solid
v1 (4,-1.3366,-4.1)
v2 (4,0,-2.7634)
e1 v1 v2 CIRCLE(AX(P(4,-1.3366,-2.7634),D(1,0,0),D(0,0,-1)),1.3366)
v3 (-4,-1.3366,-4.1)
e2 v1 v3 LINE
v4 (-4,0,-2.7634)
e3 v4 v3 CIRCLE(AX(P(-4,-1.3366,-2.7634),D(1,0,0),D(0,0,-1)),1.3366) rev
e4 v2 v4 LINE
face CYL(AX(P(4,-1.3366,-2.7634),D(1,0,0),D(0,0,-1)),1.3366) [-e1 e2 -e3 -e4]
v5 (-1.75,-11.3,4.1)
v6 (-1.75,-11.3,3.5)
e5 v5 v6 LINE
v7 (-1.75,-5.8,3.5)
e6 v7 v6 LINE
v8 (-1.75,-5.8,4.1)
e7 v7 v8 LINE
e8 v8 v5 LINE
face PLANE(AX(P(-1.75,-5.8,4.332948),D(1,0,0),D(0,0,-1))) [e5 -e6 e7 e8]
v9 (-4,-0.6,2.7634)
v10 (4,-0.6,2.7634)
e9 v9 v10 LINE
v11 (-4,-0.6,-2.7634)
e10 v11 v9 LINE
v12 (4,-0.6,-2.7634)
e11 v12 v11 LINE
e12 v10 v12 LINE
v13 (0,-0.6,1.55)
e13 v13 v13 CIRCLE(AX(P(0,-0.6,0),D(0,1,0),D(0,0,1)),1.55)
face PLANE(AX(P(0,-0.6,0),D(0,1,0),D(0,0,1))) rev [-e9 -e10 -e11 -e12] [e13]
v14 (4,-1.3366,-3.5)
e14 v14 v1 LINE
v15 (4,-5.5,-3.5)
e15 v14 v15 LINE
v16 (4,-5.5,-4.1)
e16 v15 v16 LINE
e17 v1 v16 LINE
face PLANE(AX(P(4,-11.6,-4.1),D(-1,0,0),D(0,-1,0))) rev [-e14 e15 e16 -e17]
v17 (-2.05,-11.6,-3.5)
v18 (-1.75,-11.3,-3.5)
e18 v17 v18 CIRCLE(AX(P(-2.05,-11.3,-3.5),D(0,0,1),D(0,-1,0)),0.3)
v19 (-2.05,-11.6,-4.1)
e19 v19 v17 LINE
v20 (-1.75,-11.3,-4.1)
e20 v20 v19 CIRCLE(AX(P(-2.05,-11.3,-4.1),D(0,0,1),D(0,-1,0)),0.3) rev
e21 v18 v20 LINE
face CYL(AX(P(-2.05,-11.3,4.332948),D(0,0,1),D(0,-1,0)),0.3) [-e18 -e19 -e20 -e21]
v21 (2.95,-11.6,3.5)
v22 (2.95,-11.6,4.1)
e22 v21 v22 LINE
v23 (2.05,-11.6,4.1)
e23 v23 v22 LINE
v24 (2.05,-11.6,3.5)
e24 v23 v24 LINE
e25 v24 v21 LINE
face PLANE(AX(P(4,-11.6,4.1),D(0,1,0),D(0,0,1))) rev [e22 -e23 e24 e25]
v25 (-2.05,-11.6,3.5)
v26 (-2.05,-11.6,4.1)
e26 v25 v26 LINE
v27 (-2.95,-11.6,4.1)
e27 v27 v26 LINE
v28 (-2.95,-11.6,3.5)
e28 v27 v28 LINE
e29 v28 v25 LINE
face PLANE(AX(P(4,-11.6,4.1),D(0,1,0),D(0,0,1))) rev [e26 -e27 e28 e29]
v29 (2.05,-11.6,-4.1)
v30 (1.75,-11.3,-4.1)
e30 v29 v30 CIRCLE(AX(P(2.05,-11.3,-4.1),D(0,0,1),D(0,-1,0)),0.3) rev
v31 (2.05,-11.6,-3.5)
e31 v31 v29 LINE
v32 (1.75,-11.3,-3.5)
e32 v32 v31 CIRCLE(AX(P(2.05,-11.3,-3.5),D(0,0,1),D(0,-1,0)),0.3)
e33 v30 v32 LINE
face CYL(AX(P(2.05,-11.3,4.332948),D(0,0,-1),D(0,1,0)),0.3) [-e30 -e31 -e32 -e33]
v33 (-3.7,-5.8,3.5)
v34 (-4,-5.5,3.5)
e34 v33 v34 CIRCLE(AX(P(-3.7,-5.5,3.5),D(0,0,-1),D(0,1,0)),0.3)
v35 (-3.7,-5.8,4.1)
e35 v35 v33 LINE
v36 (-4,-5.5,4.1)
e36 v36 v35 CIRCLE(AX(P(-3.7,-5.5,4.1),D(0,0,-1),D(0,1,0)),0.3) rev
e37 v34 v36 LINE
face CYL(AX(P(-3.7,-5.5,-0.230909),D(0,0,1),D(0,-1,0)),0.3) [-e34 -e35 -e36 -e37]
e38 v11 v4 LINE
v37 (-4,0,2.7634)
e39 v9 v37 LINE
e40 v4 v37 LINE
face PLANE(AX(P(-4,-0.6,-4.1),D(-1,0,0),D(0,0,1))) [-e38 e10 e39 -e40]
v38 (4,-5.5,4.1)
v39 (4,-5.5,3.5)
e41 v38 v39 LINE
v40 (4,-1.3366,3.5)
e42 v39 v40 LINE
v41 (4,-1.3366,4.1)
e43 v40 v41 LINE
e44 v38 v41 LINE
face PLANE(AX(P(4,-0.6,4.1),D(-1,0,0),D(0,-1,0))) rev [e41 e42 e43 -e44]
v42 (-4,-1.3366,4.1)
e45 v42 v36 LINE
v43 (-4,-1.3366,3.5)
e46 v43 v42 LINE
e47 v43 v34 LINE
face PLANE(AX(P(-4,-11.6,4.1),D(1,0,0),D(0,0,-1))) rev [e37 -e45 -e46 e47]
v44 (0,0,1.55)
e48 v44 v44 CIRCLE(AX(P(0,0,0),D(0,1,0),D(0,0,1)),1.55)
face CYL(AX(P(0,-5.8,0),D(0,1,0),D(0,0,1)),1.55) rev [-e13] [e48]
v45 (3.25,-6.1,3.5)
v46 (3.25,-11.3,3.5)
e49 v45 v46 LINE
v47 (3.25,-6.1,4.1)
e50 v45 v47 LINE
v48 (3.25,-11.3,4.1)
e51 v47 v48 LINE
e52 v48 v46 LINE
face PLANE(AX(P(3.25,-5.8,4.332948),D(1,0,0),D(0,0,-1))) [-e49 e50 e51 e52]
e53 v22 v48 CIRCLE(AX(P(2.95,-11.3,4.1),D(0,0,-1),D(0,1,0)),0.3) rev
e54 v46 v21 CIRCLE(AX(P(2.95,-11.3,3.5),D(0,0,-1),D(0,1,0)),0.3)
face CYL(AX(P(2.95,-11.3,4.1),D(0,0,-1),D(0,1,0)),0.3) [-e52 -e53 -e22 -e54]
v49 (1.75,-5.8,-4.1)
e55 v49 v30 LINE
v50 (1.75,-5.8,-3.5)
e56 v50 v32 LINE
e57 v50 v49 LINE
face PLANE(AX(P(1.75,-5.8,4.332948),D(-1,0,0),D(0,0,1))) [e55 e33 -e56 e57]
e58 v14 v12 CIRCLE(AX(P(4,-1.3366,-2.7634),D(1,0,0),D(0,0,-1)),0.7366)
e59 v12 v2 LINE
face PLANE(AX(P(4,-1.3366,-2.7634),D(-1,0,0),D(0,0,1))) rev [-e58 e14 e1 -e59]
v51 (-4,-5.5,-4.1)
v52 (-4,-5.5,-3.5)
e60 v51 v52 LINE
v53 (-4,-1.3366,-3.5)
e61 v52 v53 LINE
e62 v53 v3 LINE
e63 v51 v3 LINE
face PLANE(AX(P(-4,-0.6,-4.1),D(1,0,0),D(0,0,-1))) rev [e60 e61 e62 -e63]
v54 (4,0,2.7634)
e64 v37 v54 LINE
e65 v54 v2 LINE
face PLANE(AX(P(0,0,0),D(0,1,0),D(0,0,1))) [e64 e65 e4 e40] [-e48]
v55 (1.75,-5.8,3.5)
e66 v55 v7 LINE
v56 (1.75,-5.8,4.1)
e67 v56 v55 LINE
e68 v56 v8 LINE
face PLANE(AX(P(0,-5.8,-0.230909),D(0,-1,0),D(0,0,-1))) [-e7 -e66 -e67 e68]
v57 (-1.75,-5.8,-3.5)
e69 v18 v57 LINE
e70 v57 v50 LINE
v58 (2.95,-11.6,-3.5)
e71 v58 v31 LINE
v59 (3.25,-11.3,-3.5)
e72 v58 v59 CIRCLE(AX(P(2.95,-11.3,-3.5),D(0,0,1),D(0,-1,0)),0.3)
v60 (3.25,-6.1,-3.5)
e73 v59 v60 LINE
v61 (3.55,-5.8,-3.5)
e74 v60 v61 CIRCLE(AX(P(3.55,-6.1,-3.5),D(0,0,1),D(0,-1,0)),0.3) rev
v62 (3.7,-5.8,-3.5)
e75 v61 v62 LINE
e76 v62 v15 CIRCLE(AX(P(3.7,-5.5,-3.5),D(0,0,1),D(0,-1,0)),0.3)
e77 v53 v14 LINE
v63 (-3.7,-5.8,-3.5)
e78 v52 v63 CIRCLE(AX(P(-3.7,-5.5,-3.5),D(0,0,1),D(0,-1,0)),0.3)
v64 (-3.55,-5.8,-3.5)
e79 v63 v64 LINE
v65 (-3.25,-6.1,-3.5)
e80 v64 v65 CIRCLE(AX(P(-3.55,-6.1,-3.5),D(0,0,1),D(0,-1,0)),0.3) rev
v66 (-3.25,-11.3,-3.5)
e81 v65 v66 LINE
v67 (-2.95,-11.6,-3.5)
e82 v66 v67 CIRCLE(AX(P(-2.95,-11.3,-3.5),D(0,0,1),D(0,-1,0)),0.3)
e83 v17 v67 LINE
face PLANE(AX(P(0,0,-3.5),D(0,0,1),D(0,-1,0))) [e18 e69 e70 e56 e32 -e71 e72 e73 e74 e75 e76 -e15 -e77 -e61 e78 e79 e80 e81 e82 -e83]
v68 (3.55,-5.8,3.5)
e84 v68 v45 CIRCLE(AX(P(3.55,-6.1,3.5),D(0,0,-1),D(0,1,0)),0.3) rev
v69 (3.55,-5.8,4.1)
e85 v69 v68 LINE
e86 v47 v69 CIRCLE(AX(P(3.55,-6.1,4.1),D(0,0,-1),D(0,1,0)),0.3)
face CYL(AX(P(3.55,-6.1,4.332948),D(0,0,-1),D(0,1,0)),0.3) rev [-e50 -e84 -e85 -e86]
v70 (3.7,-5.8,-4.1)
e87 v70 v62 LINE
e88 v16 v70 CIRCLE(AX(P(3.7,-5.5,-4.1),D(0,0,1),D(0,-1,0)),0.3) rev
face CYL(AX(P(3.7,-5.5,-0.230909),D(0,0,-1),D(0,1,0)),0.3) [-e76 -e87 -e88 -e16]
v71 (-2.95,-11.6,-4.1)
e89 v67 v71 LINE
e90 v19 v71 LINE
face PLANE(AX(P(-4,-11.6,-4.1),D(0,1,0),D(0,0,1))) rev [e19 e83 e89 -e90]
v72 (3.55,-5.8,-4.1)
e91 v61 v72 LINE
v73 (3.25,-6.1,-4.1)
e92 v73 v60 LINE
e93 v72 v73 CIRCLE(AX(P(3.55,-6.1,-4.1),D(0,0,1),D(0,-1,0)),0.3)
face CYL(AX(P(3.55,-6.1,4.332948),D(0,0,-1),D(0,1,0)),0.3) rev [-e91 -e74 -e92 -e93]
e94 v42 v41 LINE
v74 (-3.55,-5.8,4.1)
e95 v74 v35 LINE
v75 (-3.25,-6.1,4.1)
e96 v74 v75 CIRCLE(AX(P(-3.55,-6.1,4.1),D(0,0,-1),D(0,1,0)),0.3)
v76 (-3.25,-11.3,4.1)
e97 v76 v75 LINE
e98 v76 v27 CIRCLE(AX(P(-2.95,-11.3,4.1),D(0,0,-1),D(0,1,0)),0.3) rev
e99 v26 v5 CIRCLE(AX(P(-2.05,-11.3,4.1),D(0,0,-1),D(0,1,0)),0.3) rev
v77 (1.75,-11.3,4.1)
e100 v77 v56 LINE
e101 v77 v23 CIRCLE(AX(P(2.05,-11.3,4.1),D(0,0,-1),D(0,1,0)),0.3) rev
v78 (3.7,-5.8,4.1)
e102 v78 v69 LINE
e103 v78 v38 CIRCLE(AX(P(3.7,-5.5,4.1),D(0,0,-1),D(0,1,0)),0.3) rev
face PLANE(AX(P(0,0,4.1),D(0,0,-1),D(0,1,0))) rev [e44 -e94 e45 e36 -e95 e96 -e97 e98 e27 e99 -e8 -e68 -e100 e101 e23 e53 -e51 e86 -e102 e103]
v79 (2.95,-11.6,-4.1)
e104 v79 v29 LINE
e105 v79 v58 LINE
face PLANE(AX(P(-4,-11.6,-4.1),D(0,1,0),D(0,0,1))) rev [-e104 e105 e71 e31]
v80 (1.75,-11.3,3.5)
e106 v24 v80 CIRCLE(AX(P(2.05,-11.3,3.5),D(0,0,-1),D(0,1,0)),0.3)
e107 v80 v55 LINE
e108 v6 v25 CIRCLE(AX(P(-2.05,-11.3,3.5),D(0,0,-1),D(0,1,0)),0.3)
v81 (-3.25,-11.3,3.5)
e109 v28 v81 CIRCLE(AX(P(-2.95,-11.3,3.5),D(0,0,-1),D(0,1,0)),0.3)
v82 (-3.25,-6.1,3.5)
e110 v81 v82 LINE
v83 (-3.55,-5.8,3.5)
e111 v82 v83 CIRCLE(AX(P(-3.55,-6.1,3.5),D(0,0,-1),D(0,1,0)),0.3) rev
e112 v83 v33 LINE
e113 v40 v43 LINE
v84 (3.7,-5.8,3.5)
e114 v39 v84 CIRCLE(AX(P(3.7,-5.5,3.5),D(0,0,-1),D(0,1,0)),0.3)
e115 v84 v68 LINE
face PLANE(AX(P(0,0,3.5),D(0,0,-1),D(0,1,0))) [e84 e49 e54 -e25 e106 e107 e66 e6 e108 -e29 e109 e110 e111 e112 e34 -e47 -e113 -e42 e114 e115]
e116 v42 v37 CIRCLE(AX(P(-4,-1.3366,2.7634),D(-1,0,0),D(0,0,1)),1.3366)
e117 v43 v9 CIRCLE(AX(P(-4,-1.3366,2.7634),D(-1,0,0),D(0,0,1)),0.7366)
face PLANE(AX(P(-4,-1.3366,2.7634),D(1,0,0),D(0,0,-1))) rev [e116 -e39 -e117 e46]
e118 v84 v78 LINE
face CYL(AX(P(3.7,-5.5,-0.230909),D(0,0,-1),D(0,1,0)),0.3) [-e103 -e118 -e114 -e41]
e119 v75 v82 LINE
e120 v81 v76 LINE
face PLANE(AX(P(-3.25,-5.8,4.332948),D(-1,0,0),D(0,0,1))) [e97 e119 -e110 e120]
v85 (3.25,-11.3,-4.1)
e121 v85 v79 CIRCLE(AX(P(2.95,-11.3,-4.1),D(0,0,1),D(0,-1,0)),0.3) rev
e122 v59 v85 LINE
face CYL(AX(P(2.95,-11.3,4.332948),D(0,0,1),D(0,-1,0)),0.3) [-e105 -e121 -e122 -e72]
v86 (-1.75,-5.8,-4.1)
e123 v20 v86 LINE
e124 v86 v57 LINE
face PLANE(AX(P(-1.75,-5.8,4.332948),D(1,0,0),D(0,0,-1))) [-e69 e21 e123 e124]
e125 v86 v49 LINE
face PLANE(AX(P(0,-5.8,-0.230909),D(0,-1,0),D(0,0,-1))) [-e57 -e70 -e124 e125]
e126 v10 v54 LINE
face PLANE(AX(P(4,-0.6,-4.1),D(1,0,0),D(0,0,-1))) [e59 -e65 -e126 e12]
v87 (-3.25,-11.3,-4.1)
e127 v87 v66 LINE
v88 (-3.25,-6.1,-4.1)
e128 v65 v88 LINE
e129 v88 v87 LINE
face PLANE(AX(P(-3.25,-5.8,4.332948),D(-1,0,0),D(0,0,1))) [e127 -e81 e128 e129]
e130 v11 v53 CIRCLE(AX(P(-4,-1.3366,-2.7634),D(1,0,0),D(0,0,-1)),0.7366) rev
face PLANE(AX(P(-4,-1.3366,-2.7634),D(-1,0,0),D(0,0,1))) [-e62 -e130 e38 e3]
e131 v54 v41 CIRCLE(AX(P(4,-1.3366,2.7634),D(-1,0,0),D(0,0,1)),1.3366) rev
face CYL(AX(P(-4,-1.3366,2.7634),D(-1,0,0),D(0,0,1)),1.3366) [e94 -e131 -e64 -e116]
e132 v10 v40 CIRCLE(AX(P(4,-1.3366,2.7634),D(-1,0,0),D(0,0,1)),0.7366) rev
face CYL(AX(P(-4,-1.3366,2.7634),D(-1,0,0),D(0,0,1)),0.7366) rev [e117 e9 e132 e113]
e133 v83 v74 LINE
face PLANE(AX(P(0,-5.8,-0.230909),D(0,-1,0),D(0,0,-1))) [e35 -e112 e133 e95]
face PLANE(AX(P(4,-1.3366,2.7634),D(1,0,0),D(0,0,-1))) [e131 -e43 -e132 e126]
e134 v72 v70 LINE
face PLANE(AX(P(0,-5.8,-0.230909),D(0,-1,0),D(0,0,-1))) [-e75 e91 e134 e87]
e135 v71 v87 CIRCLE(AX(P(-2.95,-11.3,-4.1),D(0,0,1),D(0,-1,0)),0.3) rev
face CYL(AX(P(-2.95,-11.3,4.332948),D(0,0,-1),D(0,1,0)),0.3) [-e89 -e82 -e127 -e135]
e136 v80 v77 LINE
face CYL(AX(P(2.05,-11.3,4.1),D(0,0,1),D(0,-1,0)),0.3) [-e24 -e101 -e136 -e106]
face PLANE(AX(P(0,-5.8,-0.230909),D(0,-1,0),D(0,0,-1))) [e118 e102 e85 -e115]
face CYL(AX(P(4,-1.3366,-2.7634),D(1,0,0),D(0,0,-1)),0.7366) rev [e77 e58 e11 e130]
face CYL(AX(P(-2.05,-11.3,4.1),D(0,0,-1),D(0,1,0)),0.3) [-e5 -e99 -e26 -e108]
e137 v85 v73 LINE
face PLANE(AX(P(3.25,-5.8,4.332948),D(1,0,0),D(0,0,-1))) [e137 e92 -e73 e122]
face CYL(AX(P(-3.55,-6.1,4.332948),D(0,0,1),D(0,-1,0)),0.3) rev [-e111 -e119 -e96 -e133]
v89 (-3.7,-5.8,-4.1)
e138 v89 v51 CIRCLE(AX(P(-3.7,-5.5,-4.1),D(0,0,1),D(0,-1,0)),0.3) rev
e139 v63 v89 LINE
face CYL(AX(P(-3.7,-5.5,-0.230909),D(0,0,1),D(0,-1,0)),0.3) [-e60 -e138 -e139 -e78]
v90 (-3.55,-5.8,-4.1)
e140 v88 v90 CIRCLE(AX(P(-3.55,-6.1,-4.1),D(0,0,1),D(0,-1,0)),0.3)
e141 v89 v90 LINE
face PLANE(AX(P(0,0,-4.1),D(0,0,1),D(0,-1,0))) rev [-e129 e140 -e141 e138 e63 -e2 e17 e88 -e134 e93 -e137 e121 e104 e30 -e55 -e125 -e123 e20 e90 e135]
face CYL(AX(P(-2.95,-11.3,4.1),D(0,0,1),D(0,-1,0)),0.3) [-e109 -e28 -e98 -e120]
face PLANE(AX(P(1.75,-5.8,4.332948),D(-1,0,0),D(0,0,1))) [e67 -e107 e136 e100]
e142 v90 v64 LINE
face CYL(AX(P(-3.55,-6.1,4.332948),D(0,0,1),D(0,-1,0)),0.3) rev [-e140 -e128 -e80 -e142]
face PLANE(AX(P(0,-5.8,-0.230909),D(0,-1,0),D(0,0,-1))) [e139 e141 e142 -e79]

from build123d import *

# Parameters (mm, degrees)
SKETCH_1_W                         = 8
SKETCH_1_H                         = 8.2
SM_BASE_FLANGE_1_DEPTH             = 0.6
SM_EDGE_FLANGE_1_STRIP_W           = 3.8732
SM_EDGE_FLANGE_1_STRIP_H           = 0.6
SM_EDGE_FLANGE_1_STRIP_CUT_DEPTH   = 8
SM_EDGE_FLANGE_1_STRIP_2_W         = 3.8732
SM_EDGE_FLANGE_1_STRIP_2_H         = 0.6
SM_EDGE_FLANGE_1_STRIP_CUT_2_DEPTH = 8
SM_EDGE_FLANGE_1_DEPTH             = 8
SM_EDGE_FLANGE_1_BEND_DEPTH        = 8
SKETCH_10_OUTSIDE_W                = 13.26
SKETCH_10_OUTSIDE_H                = 13.46
SKETCH_10_OUTSIDE_W_2              = 1.5
SKETCH_10_OUTSIDE_H_2              = 9.508037294
CUT_EXTRUDE_1_DEPTH                = 5.8
FILLET_1_R                         = 0.3
FILLET_2_R                         = 0.3
SKETCH_11_R                        = 1.55
CUT_EXTRUDE_2_DEPTH                = 5.8


# Sheet-metal steps are written as plain solids
with BuildPart() as part:
    # Sketch 1 → 基体-法兰1 (new body)
    with BuildSketch(Plane(origin=(0, 0, 0), x_dir=(1, 0, 0), z_dir=(0, 1, 0))):
        Rectangle(SKETCH_1_W, SKETCH_1_H)
    extrude(amount=-SM_BASE_FLANGE_1_DEPTH)

    # 边线-法兰1 strip (across the edge) → 边线-法兰1 strip cut (cut)
    with BuildSketch(Plane(origin=(4, -0.6, 4.1), x_dir=(0, 0, -1), z_dir=(-1, 0, 0))):
        with Locations((-0.6, -0.3)):
            Rectangle(SM_EDGE_FLANGE_1_STRIP_W, SM_EDGE_FLANGE_1_STRIP_H)
    extrude(amount=SM_EDGE_FLANGE_1_STRIP_CUT_DEPTH, mode=Mode.SUBTRACT)

    # 边线-法兰1 strip 2 (across the edge) → 边线-法兰1 strip cut 2 (cut)
    with BuildSketch(Plane(origin=(-4, -0.6, -4.1), x_dir=(0, 0, 1), z_dir=(1, 0, 0))):
        with Locations((-0.6, -0.3)):
            Rectangle(SM_EDGE_FLANGE_1_STRIP_2_W, SM_EDGE_FLANGE_1_STRIP_2_H)
    extrude(amount=SM_EDGE_FLANGE_1_STRIP_CUT_2_DEPTH, mode=Mode.SUBTRACT)

    # 边线-法兰1 section (across the edge) → 边线-法兰1 (add)
    with BuildSketch(Plane(origin=(4, -0.6, 4.1), x_dir=(0, 0, -1), z_dir=(-1, 0, 0))):
        with BuildLine():
            Line((0, 0.7366), (0, 11))
            Line((0, 11), (0.6, 11))
            Line((0.6, 11), (0.6, 0.7366))
            ThreePointArc((0.6, 0.7366), (0.815745145, 0.215745145), (1.3366, 0))
            Line((1.3366, 0), (1.3366, -0.6))
            ThreePointArc((1.3366, -0.6), (0.391481076, -0.208518924), (0, 0.7366))
        make_face()
    extrude(amount=SM_EDGE_FLANGE_1_DEPTH)

    # 边线-法兰1 section 2 (across the edge) → 边线-法兰1 bend (add)
    with BuildSketch(Plane(origin=(-4, -0.6, -4.1), x_dir=(0, 0, 1), z_dir=(1, 0, 0))):
        with BuildLine():
            Line((0, 0.7366), (0, 11))
            Line((0, 11), (0.6, 11))
            Line((0.6, 11), (0.6, 0.7366))
            ThreePointArc((0.6, 0.7366), (0.815745145, 0.215745145), (1.3366, 0))
            Line((1.3366, 0), (1.3366, -0.6))
            ThreePointArc((1.3366, -0.6), (0.391481076, -0.208518924), (0, 0.7366))
        make_face()
    extrude(amount=SM_EDGE_FLANGE_1_BEND_DEPTH)

    # 草图10 outside → 切除-拉伸1 (cut)
    with BuildSketch(Plane.XZ.offset(11.6)):
        Rectangle(SKETCH_10_OUTSIDE_W, SKETCH_10_OUTSIDE_H)
        with Locations((-2.5, -0.421070223)):
            Rectangle(SKETCH_10_OUTSIDE_W_2, SKETCH_10_OUTSIDE_H_2, mode=Mode.SUBTRACT)
        with Locations((2.5, -0.421070223)):
            Rectangle(SKETCH_10_OUTSIDE_W_2, SKETCH_10_OUTSIDE_H_2, mode=Mode.SUBTRACT)
    extrude(amount=-CUT_EXTRUDE_1_DEPTH, mode=Mode.SUBTRACT)

    # 圆角1
    fillet_1_edges = [part.edges().sort_by_distance(p)[0] for p in [
        (-3.25, -11.6, 3.8),
        (-1.75, -11.6, 3.8),
        (3.25, -11.6, 3.8),
        (1.75, -11.6, 3.8),
        (1.75, -11.6, -3.8),
        (3.25, -11.6, -3.8),
        (-1.75, -11.6, -3.8),
        (-3.25, -11.6, -3.8),
    ]]
    fillet(fillet_1_edges, radius=FILLET_1_R)

    # 圆角2
    fillet_2_edges = [part.edges().sort_by_distance(p)[0] for p in [
        (3.25, -5.8, 3.8),
        (-3.25, -5.8, 3.8),
        (-3.25, -5.8, -3.8),
        (3.25, -5.8, -3.8),
        (-4, -5.8, 3.8),
        (-4, -5.8, -3.8),
        (4, -5.8, -3.8),
        (4, -5.8, 3.8),
    ]]
    fillet(fillet_2_edges, radius=FILLET_2_R)

    # 草图11 → 切除-拉伸2 (cut)
    with BuildSketch(Plane(origin=(0, 0, 0), x_dir=(1, 0, 0), z_dir=(0, 1, 0))):
        with Locations(Location((0, 0, 0), (0, 0, 270))):
            Circle(SKETCH_11_R)
    extrude(amount=-CUT_EXTRUDE_2_DEPTH, mode=Mode.SUBTRACT)


solid = part.part
